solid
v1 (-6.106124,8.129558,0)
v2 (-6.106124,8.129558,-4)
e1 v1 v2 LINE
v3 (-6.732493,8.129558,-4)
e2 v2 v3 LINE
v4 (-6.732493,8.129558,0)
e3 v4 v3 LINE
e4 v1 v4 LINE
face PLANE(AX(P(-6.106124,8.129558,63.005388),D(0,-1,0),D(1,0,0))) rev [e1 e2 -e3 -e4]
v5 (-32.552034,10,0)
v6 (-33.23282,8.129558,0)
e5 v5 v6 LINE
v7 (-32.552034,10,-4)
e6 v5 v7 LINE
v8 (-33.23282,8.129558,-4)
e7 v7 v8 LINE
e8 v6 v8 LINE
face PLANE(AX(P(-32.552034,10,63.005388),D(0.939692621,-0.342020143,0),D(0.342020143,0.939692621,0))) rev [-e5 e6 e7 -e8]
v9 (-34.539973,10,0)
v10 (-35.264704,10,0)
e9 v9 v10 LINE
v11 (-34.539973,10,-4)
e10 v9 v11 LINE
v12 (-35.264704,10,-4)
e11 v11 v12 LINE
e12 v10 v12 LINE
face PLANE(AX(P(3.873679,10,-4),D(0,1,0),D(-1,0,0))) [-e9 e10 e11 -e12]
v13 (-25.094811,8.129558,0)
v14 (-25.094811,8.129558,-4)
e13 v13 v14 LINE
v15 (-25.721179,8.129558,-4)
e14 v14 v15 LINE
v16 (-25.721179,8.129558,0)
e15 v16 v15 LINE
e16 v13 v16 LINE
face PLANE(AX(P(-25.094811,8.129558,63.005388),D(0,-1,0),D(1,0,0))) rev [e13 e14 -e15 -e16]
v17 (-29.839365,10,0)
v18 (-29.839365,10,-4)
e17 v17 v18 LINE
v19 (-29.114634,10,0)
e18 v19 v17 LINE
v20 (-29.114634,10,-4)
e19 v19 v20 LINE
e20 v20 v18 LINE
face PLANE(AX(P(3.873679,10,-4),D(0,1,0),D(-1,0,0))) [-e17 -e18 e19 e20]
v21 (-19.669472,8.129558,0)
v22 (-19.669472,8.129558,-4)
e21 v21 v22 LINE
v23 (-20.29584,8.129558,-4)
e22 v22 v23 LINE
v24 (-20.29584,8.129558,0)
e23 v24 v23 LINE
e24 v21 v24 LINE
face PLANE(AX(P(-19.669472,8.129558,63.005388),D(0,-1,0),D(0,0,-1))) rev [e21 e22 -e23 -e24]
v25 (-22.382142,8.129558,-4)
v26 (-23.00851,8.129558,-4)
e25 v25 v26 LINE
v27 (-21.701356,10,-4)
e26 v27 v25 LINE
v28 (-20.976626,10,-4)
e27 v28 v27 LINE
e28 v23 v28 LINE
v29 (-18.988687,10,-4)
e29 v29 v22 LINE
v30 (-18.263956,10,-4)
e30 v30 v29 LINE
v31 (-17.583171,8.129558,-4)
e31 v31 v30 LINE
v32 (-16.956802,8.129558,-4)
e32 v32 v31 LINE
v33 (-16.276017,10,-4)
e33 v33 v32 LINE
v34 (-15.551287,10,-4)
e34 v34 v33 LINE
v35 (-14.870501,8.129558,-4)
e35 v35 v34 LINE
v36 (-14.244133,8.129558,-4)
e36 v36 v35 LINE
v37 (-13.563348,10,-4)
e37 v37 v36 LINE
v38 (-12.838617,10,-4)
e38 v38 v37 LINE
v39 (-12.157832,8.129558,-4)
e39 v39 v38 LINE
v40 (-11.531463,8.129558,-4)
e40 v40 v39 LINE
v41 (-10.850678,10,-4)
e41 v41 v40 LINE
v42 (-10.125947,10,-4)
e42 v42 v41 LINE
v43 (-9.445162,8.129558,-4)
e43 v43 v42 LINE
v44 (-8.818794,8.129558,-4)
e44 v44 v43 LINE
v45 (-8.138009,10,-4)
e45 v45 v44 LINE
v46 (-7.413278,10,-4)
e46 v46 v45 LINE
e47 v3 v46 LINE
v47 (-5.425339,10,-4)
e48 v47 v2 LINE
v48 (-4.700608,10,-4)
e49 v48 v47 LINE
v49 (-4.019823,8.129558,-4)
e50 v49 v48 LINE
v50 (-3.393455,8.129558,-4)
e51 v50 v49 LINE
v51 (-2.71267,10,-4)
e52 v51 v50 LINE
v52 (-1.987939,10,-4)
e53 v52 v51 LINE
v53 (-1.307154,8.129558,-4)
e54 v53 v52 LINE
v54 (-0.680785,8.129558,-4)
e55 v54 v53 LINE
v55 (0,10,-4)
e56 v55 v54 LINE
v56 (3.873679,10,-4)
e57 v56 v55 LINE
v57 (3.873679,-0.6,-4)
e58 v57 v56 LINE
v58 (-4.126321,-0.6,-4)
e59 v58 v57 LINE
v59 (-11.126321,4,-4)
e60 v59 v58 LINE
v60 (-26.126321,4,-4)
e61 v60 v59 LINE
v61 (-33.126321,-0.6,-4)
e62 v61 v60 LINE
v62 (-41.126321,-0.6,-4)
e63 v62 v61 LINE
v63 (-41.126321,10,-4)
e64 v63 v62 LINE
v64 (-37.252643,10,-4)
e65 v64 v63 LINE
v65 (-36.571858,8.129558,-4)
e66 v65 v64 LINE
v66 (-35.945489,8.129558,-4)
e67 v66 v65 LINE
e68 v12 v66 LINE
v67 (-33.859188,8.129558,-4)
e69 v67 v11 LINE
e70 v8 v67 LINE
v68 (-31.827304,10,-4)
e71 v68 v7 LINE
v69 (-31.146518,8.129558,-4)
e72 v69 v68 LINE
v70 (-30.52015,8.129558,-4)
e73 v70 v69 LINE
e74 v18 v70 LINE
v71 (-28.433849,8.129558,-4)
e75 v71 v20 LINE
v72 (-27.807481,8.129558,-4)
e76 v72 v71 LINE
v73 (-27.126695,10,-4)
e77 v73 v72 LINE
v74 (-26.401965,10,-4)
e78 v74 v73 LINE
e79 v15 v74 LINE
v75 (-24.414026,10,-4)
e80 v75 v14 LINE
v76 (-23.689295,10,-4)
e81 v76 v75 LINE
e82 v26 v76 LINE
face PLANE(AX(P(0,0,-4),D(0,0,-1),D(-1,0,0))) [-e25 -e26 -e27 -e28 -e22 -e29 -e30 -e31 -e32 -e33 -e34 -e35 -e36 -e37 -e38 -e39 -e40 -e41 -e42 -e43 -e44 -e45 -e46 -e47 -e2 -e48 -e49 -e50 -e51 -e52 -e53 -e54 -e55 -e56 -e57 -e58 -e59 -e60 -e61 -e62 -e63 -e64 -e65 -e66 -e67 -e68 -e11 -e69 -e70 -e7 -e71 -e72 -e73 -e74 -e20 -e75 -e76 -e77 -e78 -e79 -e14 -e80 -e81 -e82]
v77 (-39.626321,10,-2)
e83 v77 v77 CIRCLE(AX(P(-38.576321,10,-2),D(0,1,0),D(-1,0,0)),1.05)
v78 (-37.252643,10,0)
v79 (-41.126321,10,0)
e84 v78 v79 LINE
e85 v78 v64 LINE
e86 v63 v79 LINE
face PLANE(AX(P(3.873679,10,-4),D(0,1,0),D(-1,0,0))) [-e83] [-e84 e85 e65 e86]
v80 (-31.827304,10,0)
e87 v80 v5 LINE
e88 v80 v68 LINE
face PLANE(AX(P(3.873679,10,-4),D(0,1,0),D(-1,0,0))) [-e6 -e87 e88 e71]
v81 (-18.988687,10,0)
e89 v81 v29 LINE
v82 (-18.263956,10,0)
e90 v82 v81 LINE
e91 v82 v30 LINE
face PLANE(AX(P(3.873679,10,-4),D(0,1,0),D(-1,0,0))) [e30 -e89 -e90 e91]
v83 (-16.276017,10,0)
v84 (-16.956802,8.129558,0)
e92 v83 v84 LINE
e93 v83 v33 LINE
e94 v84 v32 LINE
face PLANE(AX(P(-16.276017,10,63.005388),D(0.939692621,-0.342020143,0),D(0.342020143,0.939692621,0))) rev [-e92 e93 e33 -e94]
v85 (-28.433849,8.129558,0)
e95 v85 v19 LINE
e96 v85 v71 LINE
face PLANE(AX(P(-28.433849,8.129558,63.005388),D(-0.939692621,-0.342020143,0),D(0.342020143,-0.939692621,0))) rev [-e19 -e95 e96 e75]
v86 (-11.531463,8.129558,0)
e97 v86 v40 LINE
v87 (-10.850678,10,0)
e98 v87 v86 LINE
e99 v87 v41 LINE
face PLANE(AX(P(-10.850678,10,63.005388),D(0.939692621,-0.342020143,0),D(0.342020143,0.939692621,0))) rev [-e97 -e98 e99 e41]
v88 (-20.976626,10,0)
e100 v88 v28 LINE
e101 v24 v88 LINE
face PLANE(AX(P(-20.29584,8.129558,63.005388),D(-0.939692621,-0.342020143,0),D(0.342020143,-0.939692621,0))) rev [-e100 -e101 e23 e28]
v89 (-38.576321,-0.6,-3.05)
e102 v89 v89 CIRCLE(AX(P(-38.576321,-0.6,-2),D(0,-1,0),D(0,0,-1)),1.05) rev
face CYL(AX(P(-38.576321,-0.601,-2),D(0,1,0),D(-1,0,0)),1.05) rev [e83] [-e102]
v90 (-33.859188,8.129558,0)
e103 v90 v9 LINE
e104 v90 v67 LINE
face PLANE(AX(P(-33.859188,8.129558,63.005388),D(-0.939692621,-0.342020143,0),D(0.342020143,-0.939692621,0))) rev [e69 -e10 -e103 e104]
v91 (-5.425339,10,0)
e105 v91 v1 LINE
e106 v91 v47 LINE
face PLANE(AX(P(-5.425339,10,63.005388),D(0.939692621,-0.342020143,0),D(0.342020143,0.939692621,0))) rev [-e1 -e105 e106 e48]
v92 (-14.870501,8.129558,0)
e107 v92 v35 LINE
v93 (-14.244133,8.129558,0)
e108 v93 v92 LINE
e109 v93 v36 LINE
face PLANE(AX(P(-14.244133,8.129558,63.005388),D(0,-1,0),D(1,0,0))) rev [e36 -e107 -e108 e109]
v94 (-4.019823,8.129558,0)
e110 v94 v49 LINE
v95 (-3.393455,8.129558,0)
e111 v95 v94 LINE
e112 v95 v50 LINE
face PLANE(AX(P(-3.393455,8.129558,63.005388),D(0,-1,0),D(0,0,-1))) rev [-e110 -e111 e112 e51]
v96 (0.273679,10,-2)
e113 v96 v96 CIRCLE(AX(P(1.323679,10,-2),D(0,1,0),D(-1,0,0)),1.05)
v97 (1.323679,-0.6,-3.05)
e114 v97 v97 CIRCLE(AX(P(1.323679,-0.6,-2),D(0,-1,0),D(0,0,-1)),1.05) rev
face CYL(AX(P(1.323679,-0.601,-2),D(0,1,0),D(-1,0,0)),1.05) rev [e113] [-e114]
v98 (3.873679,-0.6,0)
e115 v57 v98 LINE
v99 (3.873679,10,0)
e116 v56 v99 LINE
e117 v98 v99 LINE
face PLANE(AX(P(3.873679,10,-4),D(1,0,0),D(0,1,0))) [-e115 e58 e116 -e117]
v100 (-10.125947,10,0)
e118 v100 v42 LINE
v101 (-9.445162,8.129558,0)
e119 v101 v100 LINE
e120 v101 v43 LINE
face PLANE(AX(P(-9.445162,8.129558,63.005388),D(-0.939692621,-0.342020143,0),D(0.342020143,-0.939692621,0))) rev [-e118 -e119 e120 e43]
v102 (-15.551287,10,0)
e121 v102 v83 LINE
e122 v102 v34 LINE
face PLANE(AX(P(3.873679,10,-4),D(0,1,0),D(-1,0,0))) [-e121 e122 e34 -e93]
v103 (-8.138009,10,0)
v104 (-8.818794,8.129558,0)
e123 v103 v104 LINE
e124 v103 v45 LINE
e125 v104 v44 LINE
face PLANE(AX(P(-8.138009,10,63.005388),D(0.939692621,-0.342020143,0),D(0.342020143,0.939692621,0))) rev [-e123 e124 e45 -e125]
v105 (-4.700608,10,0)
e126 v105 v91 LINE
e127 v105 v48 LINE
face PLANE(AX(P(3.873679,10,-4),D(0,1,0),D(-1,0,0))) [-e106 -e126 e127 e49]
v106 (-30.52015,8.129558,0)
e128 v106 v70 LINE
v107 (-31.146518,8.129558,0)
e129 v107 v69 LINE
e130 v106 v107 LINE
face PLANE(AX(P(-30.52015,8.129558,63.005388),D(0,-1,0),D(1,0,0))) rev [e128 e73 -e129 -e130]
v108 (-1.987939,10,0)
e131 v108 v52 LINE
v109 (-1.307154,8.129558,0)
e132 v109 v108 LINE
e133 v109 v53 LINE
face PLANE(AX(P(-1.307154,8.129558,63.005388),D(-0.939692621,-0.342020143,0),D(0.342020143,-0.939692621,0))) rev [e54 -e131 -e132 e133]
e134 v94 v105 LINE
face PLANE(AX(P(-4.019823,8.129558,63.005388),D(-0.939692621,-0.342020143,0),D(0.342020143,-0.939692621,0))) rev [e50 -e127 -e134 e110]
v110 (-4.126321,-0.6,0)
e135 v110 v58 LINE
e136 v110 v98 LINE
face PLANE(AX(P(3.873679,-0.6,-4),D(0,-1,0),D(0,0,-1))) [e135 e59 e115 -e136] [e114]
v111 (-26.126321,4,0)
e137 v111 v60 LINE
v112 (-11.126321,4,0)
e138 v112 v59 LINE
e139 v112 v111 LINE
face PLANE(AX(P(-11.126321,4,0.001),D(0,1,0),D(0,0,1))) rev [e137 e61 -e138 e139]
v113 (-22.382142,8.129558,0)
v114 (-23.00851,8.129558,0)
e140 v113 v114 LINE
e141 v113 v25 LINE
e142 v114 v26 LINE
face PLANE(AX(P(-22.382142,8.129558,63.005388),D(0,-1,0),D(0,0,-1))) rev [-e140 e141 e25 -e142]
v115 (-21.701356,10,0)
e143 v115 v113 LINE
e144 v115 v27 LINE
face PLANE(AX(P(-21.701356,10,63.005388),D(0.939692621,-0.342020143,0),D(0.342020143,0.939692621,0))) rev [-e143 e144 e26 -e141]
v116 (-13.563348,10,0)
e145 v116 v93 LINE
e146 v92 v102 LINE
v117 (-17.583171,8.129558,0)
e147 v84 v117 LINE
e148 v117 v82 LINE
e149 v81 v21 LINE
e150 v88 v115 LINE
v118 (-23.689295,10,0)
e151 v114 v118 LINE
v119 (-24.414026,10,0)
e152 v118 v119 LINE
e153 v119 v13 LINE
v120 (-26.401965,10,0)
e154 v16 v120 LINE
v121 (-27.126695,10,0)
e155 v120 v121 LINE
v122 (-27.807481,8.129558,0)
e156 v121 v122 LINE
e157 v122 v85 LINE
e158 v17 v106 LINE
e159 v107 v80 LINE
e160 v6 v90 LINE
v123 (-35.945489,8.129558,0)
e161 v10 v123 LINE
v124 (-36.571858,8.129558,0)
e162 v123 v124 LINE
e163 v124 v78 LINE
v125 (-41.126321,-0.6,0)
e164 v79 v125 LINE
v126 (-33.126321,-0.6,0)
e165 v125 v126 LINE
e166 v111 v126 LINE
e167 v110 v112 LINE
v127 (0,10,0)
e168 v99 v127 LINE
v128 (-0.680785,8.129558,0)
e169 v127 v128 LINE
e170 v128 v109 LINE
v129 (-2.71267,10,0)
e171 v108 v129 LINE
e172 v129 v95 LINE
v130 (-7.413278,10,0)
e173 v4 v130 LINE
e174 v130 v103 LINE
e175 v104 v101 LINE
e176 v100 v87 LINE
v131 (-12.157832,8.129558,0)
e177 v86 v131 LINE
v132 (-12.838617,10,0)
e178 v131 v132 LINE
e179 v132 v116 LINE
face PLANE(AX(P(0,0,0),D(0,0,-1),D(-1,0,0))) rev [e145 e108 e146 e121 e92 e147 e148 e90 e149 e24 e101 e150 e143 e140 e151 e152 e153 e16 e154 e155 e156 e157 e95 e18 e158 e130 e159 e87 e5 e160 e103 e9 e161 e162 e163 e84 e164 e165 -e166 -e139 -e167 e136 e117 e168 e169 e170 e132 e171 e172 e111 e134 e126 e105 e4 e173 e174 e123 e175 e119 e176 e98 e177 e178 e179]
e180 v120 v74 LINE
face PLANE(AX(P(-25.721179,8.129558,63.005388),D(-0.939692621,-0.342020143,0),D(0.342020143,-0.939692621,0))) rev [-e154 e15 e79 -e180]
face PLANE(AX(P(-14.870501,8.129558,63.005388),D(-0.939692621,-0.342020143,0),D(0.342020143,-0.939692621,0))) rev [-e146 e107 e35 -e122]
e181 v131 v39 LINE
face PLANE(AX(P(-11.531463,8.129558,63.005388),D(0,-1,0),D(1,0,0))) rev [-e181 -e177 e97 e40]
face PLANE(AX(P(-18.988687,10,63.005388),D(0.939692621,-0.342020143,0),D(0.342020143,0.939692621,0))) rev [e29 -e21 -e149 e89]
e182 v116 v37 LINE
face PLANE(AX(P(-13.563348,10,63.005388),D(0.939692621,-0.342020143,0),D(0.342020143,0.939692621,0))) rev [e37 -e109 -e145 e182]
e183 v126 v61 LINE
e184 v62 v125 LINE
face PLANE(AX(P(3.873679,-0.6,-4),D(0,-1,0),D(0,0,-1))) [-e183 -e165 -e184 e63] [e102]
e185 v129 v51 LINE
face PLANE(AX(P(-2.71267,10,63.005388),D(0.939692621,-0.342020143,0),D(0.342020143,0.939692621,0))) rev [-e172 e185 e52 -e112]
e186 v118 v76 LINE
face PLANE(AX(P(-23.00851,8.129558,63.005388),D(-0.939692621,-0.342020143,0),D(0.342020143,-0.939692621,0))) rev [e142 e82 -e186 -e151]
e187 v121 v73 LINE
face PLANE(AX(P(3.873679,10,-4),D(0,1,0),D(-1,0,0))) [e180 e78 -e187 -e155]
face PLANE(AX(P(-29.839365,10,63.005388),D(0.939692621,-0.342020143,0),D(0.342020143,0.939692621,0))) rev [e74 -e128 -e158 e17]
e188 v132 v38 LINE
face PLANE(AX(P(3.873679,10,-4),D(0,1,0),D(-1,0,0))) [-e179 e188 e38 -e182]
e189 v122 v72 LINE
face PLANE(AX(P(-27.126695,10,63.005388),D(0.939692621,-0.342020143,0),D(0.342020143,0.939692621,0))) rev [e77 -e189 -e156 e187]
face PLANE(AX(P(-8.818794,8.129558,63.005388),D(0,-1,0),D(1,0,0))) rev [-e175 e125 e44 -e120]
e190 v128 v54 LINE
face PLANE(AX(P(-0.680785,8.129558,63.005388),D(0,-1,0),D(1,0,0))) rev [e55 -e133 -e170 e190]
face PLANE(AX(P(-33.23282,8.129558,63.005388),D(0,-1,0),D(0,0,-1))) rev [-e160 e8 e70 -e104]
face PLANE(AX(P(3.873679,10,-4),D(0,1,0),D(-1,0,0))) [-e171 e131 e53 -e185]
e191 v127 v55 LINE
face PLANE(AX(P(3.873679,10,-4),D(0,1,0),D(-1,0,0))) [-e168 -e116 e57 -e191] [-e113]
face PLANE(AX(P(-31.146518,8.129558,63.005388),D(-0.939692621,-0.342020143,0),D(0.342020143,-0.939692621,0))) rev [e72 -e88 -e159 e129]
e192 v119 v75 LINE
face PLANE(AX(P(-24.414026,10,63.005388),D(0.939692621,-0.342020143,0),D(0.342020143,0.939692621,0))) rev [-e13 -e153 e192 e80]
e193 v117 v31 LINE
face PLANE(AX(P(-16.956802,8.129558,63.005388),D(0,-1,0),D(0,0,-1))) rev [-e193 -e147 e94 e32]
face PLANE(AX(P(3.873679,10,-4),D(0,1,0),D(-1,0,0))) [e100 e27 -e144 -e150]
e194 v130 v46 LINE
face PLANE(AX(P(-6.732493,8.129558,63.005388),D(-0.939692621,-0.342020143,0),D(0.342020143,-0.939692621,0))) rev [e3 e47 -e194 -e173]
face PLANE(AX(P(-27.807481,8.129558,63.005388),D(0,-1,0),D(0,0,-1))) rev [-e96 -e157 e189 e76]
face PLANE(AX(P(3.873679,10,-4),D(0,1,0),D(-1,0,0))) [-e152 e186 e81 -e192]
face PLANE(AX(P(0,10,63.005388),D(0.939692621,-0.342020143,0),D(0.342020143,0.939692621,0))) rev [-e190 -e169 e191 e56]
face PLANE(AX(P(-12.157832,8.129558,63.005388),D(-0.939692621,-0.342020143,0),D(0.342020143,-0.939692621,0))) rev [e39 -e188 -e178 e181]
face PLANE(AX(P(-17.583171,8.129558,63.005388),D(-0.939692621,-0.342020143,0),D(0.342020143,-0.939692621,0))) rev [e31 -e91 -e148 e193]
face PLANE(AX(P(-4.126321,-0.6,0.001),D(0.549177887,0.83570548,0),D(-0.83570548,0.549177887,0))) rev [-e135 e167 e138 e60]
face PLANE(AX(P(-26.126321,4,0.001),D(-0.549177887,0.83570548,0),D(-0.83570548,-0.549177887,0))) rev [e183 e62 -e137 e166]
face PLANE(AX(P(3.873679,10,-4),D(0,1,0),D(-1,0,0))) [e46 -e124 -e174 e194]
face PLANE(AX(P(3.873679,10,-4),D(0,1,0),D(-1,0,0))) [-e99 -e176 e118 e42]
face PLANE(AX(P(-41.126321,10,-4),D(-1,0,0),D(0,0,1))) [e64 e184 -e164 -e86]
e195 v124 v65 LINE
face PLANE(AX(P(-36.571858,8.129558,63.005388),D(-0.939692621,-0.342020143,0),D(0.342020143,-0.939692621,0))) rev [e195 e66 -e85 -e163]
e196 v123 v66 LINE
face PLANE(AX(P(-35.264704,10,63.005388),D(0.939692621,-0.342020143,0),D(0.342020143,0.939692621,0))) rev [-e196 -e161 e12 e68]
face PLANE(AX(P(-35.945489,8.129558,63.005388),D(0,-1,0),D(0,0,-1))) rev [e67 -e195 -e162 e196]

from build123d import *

# Parameters (mm, degrees)
SKETCH3_W           = 45
SKETCH3_H           = 10.6
BOSS_EXTRUDE2_DEPTH = 4
CUT_EXTRUDE4_REACH  = 44.658
SKETCH4_R           = 1.05
CUT_EXTRUDE7_REACH  = 44.513
CUT_EXTRUDE8_START  = -4
CUT_EXTRUDE8_DEPTH  = 4


# Read off the part's stored shape, not the designer's step: Cut-Extrude8
with BuildPart() as part:
    # Sketch3 → Boss-Extrude2 (new body)
    with BuildSketch(Plane.XY):
        with Locations((-18.626321401, 4.7)):
            Rectangle(SKETCH3_W, SKETCH3_H)
    extrude(amount=-BOSS_EXTRUDE2_DEPTH)

    # Sketch4 → Cut-Extrude4 (cut, up to next)
    with BuildSketch(Plane(origin=(0, 10, 0), x_dir=(1, 0, 0), z_dir=(0, 1, 0)), mode=Mode.PRIVATE) as cut_extrude4_sk1:
        with Locations(Location((-38.576321401, 2, 0), (0, 0, 180))):
            Circle(SKETCH4_R)
    cut_extrude4_tool1 = extrude(cut_extrude4_sk1.sketch, amount=-CUT_EXTRUDE4_REACH, mode=Mode.PRIVATE) & part.part
    # Sketch4 → Cut-Extrude4 (cut, up to next)
    with BuildSketch(Plane(origin=(0, 10, 0), x_dir=(1, 0, 0), z_dir=(0, 1, 0)), mode=Mode.PRIVATE) as cut_extrude4_sk2:
        with Locations(Location((1.323678599, 2, 0), (0, 0, 180))):
            Circle(SKETCH4_R)
    cut_extrude4_tool2 = extrude(cut_extrude4_sk2.sketch, amount=-CUT_EXTRUDE4_REACH, mode=Mode.PRIVATE) & part.part
    add(cut_extrude4_tool1.solids().sort_by_distance((-38.576321, 10, -2))[0], mode=Mode.SUBTRACT)
    add(cut_extrude4_tool2.solids().sort_by_distance((1.323679, 10, -2))[0], mode=Mode.SUBTRACT)

    # Sketch6 → Cut-Extrude7 (cut, up to next)
    with BuildSketch(Plane(origin=(0, 0, -4), x_dir=(-1, 0, 0), z_dir=(0, 0, -1)), mode=Mode.PRIVATE) as cut_extrude7_sk1:
        Polygon((4.126321401, -0.6), (11.126321401, 4), (26.126321401, 4), (33.126321401, -0.6), align=None)
    cut_extrude7_tool1 = extrude(cut_extrude7_sk1.sketch, amount=-CUT_EXTRUDE7_REACH, mode=Mode.PRIVATE) & part.part
    add(cut_extrude7_tool1.solids().sort_by_distance((-18.626321, 1.456061, -4))[0], mode=Mode.SUBTRACT)

    # Cut-Extrude8 outline → Cut-Extrude8 (cut)
    with BuildSketch(Plane.XY.offset(CUT_EXTRUDE8_START)):
        Polygon((-35.264703894, 10), (-37.252642802, 10), (-36.571857508, 8.129557778), (-35.945489188, 8.129557778), align=None)
        Polygon((0, 10), (-1.987938907, 10), (-1.307153614, 8.129557778), (-0.680785294, 8.129557778), align=None)
        Polygon((-2.71266953, 10), (-4.700608438, 10), (-4.019823144, 8.129557778), (-3.393454824, 8.129557778), align=None)
        Polygon((-5.425339061, 10), (-7.413277968, 10), (-6.732492674, 8.129557778), (-6.106124354, 8.129557778), align=None)
        Polygon((-8.138008591, 10), (-10.125947498, 10), (-9.445162205, 8.129557778), (-8.818793885, 8.129557778), align=None)
        Polygon((-10.850678121, 10), (-12.838617029, 10), (-12.157831735, 8.129557778), (-11.531463415, 8.129557778), align=None)
        Polygon((-13.563347652, 10), (-15.551286559, 10), (-14.870501265, 8.129557778), (-14.244132945, 8.129557778), align=None)
        Polygon((-16.276017182, 10), (-18.263956089, 10), (-17.583170796, 8.129557778), (-16.956802476, 8.129557778), align=None)
        Polygon((-18.988686712, 10), (-20.97662562, 10), (-20.295840326, 8.129557778), (-19.669472006, 8.129557778), align=None)
        Polygon((-21.701356243, 10), (-23.68929515, 10), (-23.008509856, 8.129557778), (-22.382141536, 8.129557778), align=None)
        Polygon((-24.414025773, 10), (-26.40196468, 10), (-25.721179387, 8.129557778), (-25.094811067, 8.129557778), align=None)
        Polygon((-27.126695303, 10), (-29.114634211, 10), (-28.433848917, 8.129557778), (-27.807480597, 8.129557778), align=None)
        Polygon((-29.839364834, 10), (-31.827303741, 10), (-31.146518447, 8.129557778), (-30.520150127, 8.129557778), align=None)
        Polygon((-32.552034364, 10), (-34.539973271, 10), (-33.859187978, 8.129557778), (-33.232819658, 8.129557778), align=None)
    extrude(amount=CUT_EXTRUDE8_DEPTH, mode=Mode.SUBTRACT)


solid = part.part
